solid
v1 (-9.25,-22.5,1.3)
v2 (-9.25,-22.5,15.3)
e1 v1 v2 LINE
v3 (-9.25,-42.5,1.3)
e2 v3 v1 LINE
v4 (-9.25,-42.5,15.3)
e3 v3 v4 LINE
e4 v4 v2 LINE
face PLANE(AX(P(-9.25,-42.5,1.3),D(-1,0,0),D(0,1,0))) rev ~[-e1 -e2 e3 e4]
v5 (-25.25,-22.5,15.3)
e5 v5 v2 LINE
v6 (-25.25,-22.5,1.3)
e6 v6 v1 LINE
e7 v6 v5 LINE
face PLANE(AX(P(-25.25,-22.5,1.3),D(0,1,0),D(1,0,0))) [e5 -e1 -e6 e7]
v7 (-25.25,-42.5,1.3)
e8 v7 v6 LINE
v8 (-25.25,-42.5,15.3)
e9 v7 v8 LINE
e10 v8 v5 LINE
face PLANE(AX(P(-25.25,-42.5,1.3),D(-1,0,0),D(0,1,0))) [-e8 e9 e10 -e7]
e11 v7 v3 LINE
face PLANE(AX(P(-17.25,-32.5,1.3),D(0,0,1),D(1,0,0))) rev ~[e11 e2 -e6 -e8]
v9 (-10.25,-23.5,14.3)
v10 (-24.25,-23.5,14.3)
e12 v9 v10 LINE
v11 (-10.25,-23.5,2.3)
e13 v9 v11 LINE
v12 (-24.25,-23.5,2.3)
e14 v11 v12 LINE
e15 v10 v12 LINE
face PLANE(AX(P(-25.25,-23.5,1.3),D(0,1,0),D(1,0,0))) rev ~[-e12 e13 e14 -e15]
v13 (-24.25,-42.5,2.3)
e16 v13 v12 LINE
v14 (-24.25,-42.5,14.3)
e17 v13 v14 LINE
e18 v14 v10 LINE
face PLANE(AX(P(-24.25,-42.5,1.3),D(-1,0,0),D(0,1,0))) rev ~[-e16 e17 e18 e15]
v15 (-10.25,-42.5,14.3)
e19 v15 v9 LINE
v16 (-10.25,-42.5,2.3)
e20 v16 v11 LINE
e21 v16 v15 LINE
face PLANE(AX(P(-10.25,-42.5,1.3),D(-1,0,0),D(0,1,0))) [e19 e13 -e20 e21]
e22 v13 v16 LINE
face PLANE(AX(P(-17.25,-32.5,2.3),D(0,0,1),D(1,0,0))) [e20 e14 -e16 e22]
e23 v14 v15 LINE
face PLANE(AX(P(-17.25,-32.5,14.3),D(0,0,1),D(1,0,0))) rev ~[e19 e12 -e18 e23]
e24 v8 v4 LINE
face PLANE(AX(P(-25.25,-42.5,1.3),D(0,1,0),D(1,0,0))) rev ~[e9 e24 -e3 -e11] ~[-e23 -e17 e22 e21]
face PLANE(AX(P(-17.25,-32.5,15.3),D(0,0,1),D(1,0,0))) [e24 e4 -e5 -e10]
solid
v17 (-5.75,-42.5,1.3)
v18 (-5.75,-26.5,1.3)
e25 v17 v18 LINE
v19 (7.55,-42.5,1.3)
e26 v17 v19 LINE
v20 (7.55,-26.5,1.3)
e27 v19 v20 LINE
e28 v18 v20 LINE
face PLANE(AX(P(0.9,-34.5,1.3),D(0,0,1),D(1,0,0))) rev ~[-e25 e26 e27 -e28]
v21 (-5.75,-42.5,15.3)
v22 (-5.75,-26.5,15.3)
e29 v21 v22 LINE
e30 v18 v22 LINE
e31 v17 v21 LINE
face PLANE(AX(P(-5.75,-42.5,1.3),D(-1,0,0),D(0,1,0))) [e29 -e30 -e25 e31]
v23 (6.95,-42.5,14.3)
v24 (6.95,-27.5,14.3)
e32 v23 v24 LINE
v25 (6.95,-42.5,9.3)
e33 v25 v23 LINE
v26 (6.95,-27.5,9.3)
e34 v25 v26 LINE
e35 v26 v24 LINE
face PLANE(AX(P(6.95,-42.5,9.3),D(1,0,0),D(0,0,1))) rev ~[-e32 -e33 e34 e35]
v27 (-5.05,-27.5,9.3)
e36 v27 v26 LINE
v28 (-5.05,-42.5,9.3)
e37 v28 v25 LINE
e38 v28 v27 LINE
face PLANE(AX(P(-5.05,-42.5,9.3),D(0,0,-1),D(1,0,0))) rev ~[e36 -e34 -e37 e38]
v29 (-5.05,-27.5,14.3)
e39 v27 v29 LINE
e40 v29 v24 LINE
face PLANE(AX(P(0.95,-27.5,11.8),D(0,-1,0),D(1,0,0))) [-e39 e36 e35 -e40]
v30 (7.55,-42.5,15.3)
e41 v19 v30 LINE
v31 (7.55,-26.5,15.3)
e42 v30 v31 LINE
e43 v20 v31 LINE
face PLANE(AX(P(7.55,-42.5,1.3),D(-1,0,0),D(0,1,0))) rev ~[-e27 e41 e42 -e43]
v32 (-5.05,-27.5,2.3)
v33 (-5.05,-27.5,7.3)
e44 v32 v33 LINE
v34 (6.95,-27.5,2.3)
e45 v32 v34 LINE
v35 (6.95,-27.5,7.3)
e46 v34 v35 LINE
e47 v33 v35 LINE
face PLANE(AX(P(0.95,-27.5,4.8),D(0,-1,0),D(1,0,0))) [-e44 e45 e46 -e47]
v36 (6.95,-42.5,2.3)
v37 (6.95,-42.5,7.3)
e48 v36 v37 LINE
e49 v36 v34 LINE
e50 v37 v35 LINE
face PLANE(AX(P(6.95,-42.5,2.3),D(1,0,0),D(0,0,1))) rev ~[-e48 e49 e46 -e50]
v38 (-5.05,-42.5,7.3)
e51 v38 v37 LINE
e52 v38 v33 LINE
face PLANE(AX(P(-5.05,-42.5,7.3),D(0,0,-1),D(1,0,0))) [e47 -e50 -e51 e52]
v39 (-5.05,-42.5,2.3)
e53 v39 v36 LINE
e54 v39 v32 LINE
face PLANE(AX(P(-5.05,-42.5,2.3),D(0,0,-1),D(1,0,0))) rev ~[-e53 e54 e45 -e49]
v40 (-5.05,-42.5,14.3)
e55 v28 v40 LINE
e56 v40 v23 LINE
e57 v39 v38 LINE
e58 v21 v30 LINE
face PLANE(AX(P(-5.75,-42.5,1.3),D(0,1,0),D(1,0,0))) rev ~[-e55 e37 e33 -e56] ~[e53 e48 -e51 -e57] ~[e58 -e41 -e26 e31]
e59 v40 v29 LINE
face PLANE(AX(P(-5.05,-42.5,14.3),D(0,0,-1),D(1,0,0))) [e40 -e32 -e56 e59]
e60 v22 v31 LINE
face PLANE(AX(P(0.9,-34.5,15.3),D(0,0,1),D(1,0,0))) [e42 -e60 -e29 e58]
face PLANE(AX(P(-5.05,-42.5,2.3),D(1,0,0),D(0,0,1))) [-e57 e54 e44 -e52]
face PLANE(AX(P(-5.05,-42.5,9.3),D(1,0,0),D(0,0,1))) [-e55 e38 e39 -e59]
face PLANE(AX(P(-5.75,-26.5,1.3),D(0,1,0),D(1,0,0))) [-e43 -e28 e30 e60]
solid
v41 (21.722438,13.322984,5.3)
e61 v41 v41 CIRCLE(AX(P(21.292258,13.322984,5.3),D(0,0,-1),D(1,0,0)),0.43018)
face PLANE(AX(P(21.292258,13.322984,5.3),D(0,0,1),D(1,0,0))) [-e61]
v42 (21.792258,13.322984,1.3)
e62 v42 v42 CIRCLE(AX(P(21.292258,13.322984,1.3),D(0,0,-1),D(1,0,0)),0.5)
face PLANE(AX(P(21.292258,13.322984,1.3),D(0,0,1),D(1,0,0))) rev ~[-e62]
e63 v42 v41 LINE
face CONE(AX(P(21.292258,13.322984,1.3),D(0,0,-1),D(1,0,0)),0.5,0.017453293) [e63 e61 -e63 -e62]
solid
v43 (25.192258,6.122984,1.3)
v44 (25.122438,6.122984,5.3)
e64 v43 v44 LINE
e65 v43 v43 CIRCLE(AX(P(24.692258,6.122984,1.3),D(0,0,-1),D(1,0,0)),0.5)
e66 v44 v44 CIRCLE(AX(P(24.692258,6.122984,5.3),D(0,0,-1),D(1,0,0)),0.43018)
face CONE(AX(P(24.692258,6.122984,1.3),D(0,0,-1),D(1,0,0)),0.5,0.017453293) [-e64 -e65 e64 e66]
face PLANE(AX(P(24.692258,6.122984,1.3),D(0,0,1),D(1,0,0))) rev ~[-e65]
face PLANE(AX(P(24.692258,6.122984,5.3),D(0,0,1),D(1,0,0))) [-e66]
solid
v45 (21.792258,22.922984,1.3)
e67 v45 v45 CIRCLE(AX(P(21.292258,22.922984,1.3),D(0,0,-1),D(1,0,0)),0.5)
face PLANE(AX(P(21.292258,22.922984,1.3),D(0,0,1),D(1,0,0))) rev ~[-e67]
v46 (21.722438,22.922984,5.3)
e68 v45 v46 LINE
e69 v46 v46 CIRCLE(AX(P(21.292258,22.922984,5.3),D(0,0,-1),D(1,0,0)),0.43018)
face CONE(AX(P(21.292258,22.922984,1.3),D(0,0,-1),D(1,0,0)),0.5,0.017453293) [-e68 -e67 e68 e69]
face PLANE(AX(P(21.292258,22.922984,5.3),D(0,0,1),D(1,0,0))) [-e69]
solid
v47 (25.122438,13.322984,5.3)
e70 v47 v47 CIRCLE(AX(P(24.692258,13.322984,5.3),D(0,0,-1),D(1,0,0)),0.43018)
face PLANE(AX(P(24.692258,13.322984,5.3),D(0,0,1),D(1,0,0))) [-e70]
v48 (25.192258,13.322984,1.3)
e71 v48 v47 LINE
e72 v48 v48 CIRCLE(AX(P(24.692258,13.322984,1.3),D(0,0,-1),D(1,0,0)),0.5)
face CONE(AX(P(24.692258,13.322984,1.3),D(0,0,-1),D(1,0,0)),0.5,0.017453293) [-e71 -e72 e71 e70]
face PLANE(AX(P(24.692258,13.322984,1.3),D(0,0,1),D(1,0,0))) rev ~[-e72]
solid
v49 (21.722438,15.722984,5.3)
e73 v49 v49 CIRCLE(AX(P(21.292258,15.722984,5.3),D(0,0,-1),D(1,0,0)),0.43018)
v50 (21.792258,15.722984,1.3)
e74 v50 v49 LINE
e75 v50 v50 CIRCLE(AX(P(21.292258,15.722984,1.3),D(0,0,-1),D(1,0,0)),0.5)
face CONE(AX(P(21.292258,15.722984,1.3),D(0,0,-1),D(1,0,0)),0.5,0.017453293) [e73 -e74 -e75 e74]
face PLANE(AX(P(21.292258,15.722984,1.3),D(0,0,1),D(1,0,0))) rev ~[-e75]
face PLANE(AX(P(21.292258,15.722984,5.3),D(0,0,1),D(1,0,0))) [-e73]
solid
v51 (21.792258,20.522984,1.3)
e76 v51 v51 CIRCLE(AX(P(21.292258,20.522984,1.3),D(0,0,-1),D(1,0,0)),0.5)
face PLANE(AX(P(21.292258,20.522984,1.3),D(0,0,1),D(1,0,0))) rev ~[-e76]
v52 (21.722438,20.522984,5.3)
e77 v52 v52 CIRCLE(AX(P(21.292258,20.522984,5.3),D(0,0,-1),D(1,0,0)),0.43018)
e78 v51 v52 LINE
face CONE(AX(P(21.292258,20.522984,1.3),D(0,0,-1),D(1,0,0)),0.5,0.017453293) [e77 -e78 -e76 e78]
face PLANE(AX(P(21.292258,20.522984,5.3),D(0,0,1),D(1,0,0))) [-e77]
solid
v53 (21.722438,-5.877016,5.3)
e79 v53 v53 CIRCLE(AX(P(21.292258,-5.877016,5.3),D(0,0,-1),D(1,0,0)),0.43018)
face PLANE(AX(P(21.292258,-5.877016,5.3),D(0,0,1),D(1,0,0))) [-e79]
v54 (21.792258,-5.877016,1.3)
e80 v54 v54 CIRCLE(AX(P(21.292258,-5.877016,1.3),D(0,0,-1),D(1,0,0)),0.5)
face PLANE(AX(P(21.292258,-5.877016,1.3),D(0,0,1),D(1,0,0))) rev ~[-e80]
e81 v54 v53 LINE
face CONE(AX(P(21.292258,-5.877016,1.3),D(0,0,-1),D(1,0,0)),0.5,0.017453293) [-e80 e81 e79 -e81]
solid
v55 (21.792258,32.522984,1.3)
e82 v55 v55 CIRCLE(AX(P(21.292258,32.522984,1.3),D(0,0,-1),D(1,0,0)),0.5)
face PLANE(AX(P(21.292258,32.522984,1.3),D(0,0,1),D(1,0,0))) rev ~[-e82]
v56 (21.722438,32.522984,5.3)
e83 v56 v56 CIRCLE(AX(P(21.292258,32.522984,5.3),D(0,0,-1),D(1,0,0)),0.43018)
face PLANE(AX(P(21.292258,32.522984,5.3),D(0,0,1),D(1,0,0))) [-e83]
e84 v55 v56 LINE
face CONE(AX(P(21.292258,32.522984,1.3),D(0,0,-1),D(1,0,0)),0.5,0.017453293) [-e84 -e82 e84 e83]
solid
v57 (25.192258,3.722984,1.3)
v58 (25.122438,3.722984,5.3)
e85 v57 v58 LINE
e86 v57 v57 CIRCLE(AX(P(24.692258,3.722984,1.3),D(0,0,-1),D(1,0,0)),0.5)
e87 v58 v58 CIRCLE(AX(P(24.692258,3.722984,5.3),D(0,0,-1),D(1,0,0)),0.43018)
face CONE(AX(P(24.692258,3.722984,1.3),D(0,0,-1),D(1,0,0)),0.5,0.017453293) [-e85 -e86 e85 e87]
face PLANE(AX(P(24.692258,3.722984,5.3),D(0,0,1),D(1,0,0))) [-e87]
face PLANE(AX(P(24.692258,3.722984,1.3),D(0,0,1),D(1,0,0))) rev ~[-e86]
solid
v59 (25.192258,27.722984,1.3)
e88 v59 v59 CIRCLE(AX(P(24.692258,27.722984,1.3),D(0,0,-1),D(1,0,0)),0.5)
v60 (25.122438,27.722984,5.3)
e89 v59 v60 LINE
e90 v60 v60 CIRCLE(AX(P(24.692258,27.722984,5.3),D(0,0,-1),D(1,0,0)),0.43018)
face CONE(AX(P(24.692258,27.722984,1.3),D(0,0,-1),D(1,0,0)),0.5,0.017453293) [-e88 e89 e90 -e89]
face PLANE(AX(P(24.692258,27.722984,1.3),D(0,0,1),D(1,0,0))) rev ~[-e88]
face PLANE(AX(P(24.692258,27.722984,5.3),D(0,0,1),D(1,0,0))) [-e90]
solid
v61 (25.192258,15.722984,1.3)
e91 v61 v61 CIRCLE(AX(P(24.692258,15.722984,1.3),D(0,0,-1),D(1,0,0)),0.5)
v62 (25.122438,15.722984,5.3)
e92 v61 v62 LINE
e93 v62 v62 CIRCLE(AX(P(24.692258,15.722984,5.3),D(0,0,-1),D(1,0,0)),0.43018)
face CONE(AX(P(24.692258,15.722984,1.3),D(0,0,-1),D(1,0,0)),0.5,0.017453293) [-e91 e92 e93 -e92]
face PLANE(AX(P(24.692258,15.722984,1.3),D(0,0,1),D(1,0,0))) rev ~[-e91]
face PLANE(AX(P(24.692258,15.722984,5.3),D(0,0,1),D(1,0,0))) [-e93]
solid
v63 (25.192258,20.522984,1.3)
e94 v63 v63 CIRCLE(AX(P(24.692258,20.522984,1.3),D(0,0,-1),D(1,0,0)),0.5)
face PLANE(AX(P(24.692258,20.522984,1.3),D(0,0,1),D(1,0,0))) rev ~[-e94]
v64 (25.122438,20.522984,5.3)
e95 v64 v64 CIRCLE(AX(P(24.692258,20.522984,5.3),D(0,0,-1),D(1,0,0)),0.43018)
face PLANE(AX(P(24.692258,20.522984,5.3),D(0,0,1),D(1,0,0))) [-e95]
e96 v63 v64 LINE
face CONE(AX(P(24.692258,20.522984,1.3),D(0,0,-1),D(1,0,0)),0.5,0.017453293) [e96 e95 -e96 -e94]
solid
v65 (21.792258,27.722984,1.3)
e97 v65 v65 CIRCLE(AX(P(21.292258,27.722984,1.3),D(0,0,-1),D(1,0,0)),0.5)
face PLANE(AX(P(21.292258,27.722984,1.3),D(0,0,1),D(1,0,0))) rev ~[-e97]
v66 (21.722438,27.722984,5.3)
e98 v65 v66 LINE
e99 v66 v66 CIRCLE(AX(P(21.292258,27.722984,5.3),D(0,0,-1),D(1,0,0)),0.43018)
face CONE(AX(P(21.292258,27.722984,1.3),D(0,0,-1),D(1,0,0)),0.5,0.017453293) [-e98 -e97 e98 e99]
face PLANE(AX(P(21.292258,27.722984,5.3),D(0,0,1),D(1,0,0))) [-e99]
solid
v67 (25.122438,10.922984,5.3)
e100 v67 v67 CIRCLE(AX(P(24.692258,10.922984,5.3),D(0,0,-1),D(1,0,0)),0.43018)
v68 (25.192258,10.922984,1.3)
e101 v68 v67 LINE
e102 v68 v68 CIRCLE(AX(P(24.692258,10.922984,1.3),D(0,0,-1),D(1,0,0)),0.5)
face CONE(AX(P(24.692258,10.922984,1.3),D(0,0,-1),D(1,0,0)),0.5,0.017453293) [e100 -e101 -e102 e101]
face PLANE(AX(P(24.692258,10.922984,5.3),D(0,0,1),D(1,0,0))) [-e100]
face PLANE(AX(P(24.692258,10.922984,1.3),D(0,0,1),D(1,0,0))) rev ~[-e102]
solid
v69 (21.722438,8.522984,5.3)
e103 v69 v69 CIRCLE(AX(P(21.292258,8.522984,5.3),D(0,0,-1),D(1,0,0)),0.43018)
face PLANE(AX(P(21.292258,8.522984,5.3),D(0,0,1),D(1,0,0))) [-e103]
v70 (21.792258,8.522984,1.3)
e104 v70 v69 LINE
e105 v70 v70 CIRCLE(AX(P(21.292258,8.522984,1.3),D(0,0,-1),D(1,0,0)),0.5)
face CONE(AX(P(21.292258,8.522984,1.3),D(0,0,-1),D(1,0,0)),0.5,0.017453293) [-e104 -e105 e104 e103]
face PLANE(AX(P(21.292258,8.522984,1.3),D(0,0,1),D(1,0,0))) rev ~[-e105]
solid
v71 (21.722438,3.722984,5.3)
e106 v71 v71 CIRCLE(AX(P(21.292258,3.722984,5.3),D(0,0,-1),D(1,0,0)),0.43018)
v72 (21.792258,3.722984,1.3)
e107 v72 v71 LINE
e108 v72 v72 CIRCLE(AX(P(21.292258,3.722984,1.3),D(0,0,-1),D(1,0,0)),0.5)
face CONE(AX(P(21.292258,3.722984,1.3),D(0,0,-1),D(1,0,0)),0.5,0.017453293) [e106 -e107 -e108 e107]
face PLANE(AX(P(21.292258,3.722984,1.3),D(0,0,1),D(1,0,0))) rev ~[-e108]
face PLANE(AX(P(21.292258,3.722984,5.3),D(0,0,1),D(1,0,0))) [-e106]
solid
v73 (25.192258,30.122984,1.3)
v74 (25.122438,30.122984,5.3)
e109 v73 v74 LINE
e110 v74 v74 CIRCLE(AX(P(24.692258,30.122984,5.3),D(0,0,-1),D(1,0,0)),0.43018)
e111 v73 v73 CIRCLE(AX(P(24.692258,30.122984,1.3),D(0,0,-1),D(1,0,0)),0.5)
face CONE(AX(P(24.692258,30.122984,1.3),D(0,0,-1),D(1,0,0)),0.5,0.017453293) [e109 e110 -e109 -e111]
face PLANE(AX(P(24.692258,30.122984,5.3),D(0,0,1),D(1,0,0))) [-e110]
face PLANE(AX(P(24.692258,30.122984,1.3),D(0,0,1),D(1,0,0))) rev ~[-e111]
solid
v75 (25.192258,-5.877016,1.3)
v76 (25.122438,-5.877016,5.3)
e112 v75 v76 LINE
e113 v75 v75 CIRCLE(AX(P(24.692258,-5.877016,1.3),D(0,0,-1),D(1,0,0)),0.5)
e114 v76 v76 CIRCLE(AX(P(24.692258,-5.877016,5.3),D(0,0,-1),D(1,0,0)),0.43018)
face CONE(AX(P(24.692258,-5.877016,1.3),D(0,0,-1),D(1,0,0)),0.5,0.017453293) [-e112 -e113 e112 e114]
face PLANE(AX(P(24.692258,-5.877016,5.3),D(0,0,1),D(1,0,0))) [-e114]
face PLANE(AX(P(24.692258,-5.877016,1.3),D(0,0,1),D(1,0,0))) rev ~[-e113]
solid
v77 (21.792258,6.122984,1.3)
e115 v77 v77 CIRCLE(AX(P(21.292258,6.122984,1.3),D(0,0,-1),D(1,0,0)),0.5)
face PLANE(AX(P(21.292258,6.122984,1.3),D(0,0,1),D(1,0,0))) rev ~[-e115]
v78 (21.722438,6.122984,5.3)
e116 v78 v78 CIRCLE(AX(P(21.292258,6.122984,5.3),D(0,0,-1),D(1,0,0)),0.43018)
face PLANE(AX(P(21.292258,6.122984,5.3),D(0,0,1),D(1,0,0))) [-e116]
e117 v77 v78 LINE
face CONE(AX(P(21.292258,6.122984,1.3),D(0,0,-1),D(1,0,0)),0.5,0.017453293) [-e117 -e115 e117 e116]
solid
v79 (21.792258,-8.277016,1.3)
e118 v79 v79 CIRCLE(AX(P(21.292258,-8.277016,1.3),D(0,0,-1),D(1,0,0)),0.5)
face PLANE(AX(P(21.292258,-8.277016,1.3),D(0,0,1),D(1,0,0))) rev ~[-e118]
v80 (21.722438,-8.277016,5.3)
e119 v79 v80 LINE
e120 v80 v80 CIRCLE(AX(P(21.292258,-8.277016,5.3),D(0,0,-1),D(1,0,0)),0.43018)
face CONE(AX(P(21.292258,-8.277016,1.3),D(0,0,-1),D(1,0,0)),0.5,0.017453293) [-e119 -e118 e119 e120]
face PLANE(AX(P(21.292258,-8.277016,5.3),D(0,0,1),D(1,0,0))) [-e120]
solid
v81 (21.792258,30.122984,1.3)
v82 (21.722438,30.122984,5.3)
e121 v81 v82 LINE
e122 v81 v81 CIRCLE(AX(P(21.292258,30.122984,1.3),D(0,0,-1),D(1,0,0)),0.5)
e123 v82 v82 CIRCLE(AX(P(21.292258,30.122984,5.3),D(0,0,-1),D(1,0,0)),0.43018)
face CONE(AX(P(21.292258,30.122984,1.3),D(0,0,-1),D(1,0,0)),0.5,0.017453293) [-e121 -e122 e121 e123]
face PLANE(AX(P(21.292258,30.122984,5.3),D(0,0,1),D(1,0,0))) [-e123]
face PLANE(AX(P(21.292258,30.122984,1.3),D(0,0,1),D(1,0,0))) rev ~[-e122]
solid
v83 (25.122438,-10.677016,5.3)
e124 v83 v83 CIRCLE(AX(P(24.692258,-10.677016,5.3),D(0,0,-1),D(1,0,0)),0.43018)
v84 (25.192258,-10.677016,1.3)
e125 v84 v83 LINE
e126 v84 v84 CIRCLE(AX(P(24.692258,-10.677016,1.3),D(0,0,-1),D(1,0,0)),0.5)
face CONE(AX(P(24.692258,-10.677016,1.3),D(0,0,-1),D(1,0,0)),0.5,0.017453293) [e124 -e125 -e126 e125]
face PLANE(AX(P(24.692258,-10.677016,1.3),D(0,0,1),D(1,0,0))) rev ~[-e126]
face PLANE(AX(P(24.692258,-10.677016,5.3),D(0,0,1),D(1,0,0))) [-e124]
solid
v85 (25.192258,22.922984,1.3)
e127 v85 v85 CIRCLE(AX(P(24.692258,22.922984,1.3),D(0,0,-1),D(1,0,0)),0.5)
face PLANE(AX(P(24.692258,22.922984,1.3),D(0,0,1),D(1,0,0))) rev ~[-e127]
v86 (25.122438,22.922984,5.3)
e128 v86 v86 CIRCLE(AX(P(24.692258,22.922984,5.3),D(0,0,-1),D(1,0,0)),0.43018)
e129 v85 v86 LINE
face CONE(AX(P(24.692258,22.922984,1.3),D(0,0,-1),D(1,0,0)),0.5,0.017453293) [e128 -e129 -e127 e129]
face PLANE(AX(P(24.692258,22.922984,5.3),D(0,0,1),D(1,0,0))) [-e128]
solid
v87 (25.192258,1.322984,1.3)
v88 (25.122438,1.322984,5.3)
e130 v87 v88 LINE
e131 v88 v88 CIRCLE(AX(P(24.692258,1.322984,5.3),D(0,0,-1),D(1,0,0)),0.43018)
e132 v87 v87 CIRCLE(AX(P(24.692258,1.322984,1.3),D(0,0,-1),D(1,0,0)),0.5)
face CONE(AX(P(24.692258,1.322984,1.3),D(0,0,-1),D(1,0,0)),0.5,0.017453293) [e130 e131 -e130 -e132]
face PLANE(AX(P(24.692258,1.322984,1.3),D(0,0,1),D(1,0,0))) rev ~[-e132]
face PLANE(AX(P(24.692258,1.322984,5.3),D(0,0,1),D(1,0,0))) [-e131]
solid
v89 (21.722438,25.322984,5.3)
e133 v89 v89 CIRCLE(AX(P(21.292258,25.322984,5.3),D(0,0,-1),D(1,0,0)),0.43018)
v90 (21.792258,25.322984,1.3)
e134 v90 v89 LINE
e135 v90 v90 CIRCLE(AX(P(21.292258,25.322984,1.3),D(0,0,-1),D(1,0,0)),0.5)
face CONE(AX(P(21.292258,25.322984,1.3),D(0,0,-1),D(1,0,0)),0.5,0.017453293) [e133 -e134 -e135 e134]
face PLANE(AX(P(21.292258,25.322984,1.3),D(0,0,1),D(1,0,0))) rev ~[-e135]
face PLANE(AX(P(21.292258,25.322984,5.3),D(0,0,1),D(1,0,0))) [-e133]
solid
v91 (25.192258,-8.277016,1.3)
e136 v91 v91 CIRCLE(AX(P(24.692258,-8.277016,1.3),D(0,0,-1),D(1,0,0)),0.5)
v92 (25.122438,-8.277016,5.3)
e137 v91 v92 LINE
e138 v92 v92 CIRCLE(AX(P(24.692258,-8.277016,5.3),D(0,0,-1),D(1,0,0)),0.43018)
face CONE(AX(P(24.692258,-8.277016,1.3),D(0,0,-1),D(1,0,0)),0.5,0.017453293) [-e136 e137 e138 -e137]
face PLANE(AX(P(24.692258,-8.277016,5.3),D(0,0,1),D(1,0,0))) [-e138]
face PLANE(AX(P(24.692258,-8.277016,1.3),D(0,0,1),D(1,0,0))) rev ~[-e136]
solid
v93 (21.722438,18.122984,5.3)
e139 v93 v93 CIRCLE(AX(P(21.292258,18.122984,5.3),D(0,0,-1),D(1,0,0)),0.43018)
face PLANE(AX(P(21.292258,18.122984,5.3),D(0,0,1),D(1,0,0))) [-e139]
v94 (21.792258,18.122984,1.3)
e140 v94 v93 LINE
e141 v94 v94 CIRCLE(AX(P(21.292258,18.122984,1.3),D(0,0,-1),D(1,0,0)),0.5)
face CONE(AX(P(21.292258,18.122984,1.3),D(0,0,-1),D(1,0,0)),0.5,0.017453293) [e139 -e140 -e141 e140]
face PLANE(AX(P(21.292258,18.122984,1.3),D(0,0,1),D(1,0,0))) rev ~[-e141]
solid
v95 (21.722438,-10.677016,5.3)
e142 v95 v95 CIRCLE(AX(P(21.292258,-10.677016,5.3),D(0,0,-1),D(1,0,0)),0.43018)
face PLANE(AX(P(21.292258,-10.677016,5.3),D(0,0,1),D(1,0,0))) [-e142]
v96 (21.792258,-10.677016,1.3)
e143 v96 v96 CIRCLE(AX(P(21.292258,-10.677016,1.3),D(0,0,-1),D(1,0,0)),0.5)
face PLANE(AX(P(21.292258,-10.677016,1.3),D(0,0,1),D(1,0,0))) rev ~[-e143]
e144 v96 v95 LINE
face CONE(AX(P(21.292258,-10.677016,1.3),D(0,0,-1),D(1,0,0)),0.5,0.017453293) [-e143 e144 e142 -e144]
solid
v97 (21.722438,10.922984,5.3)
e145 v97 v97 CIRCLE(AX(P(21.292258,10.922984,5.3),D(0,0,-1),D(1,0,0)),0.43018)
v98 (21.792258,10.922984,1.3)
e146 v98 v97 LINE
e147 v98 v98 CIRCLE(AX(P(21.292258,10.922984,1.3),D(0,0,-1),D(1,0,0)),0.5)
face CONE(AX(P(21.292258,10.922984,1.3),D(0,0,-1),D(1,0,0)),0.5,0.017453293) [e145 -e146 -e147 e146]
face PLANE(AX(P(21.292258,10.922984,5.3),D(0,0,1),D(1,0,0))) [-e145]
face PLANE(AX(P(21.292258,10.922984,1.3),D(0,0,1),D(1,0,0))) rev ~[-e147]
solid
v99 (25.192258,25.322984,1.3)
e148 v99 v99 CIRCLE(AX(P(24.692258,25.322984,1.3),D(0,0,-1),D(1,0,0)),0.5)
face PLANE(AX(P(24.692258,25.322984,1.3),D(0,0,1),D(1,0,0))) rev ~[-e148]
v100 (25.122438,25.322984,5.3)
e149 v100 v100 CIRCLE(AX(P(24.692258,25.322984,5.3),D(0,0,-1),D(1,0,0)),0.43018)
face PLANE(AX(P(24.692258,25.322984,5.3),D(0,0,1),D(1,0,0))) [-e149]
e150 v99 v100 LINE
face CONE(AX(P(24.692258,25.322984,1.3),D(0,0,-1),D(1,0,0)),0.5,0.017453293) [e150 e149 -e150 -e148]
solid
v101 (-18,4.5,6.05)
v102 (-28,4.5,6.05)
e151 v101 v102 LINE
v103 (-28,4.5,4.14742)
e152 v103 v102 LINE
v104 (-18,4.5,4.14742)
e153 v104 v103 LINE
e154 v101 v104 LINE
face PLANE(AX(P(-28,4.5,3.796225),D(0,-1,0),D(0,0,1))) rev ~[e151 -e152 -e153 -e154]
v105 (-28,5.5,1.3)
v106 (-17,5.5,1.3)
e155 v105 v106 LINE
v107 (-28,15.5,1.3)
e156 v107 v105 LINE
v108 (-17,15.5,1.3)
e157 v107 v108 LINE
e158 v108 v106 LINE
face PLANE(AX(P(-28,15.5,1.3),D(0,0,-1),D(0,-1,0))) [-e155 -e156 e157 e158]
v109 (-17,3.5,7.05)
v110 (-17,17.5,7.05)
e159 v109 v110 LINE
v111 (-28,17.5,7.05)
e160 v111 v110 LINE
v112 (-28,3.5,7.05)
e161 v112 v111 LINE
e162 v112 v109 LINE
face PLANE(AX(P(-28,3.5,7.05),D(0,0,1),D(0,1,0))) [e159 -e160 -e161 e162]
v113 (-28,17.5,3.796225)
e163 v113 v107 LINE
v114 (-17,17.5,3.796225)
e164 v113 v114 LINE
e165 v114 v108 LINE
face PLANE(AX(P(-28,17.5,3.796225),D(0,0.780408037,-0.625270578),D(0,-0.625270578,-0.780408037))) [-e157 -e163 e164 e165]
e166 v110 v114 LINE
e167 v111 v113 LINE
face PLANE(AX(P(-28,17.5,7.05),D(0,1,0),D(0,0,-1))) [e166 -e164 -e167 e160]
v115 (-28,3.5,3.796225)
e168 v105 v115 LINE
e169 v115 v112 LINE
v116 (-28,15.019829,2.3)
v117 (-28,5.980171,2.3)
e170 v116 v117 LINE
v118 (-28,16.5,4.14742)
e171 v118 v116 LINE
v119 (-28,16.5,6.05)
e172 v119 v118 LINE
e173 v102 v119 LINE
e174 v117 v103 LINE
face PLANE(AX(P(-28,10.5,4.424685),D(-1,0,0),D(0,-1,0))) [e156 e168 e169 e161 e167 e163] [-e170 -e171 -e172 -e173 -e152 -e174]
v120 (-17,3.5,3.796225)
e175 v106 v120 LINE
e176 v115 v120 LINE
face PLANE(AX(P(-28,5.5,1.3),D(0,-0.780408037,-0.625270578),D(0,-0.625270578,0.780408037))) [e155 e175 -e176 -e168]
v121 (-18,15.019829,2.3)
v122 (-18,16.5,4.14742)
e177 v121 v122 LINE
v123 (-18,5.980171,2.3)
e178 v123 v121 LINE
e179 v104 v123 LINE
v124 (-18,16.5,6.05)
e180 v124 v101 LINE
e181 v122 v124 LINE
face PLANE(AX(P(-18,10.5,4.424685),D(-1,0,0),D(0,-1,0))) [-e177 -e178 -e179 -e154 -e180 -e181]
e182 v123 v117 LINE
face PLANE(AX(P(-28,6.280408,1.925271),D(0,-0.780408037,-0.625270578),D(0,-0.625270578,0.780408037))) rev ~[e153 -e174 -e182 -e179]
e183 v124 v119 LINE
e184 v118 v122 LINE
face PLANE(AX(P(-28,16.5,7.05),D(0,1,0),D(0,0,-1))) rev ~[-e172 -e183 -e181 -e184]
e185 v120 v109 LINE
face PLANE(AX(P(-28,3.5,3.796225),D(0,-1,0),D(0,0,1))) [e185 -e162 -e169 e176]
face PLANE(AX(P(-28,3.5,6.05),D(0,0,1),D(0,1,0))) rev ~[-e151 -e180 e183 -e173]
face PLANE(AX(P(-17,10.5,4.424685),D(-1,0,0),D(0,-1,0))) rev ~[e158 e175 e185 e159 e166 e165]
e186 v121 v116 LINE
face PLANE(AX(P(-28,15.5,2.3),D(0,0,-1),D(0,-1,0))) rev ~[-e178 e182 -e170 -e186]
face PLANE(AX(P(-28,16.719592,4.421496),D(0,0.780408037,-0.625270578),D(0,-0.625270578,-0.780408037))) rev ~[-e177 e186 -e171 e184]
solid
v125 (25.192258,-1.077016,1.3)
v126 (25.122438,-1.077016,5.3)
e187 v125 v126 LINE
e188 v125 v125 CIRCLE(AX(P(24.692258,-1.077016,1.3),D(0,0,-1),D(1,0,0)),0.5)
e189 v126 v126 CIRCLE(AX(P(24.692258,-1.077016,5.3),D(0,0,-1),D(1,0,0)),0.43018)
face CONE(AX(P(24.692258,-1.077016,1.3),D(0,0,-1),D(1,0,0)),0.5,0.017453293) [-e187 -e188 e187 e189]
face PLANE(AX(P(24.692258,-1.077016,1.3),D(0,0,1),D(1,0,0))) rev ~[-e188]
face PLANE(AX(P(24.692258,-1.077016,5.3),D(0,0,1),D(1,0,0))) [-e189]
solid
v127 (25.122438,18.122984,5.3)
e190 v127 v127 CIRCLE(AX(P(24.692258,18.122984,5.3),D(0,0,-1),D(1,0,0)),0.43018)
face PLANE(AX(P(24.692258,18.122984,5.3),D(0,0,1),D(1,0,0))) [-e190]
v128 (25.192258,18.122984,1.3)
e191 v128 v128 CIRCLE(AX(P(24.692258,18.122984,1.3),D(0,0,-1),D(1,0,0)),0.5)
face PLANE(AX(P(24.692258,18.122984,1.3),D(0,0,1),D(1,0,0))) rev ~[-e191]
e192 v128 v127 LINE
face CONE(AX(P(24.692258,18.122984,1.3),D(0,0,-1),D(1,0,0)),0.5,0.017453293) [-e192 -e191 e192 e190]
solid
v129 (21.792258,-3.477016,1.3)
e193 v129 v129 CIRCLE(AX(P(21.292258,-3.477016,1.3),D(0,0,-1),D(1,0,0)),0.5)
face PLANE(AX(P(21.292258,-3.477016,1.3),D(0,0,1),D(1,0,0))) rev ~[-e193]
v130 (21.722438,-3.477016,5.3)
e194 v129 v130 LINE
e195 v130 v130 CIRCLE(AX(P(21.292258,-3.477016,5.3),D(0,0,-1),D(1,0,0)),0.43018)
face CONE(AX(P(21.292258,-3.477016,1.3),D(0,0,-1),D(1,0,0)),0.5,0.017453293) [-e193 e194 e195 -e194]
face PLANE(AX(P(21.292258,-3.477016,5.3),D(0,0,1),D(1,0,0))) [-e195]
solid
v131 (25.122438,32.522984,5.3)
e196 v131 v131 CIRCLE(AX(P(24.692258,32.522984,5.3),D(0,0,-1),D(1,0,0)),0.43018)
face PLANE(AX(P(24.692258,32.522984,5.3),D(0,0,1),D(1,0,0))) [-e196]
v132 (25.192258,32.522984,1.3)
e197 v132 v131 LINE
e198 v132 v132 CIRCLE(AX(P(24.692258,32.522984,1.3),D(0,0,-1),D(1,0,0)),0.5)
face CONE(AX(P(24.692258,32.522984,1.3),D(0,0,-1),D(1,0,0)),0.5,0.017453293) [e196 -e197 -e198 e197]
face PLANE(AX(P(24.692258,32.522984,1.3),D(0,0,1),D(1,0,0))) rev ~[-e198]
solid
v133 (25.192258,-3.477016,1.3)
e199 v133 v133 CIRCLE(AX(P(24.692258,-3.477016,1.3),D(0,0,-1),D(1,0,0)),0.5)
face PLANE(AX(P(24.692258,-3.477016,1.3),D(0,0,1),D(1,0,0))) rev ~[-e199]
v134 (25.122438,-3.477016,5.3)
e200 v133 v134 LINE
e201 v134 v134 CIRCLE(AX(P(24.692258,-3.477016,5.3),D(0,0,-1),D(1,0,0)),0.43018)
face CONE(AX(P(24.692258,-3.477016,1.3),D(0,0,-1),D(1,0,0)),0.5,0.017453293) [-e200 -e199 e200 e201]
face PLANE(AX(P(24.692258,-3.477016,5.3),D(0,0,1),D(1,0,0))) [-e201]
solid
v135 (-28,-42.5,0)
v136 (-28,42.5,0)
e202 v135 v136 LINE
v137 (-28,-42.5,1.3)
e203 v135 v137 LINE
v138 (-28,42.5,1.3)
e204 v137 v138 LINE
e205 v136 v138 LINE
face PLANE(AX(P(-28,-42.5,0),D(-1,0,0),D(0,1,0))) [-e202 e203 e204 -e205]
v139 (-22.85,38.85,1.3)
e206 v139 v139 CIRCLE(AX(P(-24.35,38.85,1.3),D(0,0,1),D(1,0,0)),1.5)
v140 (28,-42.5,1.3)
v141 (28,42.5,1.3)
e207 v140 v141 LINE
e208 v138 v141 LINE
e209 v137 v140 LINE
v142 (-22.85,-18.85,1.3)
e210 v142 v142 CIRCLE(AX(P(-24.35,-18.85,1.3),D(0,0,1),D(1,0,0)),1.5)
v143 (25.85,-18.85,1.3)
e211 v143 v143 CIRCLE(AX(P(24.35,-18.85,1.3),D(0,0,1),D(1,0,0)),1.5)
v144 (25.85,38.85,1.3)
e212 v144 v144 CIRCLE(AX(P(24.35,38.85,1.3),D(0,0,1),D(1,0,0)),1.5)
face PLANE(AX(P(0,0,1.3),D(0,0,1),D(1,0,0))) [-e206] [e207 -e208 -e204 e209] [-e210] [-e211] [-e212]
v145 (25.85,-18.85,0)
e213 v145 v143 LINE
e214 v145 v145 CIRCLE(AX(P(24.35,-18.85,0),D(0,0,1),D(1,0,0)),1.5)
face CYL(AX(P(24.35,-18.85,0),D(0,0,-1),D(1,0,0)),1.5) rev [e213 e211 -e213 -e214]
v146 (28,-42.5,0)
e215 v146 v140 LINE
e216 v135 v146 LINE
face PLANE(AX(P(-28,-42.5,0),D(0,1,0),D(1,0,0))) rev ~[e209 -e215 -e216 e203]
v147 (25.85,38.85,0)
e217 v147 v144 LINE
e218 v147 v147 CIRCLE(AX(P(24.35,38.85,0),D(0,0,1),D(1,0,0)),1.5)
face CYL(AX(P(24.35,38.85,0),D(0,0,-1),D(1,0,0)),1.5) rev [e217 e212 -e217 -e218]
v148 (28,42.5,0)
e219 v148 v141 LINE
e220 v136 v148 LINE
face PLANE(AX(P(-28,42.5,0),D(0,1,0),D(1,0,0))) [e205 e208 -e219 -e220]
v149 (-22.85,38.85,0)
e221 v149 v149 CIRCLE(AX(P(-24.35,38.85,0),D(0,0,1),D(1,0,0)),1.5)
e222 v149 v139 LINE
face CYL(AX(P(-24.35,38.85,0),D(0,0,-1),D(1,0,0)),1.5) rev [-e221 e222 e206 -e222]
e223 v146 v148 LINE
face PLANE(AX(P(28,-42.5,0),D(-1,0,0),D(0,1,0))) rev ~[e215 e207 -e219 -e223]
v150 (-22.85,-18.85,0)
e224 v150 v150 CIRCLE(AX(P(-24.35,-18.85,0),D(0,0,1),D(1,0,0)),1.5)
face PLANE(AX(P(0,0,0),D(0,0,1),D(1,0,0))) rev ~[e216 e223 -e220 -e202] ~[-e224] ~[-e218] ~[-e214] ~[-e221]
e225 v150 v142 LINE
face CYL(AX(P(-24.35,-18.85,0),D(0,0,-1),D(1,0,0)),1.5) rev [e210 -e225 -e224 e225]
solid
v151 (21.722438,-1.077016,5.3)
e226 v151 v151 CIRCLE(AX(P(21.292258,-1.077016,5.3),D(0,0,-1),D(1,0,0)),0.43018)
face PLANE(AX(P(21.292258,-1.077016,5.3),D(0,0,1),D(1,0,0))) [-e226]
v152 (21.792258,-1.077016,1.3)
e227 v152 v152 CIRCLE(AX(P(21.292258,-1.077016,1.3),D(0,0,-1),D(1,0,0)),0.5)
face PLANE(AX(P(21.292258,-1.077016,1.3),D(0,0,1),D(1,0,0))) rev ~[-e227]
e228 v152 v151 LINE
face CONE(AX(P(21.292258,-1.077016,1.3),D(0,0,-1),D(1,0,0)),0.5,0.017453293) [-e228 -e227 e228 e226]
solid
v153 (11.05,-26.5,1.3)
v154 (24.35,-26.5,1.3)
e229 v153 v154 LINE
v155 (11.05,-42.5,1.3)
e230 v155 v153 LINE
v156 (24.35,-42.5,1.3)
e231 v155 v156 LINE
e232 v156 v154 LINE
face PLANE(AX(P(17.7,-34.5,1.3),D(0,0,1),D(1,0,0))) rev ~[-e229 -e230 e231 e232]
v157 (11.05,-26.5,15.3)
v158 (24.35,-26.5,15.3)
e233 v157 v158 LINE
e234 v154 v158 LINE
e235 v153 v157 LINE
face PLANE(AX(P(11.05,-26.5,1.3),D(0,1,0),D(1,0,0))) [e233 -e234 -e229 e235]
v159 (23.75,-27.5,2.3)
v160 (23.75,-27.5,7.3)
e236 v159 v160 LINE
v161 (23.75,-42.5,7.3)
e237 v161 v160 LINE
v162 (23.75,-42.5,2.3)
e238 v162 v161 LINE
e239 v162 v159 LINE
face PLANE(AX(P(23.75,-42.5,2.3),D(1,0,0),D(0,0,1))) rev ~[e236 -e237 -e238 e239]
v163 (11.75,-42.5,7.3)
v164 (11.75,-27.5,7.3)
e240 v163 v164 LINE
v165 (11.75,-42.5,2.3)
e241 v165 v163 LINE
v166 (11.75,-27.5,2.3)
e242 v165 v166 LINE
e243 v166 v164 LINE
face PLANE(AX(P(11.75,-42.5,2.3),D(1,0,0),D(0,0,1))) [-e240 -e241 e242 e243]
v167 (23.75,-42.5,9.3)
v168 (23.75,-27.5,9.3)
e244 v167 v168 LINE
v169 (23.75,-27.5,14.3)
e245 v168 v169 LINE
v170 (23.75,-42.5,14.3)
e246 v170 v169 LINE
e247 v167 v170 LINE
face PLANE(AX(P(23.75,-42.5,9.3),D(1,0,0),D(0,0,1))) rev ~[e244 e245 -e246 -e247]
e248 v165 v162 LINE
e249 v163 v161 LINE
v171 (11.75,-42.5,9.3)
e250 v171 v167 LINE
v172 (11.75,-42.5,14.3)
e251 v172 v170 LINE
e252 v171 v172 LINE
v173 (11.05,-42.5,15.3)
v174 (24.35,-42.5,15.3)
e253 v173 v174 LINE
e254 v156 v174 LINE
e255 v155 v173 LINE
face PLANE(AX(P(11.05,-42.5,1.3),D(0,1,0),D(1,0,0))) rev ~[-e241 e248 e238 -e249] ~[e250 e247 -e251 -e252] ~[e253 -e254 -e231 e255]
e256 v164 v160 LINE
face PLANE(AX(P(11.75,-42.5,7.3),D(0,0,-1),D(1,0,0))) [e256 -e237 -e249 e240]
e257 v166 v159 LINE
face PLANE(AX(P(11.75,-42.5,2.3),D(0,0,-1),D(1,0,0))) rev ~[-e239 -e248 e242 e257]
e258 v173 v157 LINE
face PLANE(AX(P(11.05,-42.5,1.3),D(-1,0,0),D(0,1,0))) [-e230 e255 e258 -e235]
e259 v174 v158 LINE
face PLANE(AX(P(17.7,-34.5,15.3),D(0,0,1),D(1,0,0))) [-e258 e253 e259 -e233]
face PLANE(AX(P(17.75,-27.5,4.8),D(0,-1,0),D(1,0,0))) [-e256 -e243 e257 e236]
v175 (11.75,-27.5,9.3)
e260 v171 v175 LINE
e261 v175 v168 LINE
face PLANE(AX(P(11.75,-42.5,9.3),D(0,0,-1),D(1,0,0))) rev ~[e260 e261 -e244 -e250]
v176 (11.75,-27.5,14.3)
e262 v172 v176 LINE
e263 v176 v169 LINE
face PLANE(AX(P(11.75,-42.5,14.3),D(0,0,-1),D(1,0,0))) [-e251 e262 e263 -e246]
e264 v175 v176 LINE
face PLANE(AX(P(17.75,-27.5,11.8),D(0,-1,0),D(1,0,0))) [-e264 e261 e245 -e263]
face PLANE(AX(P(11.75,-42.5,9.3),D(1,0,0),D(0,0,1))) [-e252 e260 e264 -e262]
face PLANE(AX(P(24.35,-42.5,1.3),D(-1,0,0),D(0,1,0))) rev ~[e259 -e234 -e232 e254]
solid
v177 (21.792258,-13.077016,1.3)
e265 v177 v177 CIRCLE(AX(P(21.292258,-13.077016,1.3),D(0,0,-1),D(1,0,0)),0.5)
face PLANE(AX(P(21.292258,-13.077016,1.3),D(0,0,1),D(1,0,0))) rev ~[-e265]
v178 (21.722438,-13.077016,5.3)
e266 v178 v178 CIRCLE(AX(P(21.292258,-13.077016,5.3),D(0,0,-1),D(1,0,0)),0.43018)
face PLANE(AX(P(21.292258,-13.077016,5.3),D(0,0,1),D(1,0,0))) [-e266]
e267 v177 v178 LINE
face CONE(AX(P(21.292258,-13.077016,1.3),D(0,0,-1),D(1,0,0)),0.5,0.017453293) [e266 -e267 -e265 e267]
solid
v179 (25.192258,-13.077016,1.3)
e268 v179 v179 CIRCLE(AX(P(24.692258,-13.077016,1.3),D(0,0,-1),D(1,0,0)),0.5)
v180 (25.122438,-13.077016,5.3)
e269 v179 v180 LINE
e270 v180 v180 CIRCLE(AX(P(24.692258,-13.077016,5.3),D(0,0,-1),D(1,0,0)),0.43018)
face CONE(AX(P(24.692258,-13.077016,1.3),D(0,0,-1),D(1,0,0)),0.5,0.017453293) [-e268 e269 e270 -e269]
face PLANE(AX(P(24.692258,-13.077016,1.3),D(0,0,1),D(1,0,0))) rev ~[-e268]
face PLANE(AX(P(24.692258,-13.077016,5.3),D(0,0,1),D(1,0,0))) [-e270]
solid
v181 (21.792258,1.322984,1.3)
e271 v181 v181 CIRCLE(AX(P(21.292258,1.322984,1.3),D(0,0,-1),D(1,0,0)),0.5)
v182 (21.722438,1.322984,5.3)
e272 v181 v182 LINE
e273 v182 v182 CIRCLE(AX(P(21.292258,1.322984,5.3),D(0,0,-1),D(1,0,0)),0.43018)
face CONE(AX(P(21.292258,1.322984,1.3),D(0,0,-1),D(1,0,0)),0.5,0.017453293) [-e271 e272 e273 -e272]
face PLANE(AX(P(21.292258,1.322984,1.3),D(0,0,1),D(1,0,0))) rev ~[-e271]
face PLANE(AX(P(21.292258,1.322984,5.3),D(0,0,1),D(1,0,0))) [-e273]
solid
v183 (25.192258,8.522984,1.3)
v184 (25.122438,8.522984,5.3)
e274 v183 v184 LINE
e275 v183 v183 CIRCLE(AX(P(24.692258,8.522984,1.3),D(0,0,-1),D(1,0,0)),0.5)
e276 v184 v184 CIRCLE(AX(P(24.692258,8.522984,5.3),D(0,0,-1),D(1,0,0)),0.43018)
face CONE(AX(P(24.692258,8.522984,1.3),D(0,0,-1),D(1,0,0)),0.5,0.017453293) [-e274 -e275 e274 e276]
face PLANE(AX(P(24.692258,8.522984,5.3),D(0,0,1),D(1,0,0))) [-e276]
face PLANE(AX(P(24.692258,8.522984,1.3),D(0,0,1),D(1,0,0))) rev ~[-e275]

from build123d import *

# Parameters (mm, degrees)
F0_W      = 56
F0_H      = 85
F0_R      = 1.5
F1_DEPTH  = 1.3
F2_W      = 16
F2_H      = 20
F3_DEPTH  = 14
F2_W_2    = 13.3
F2_H_2    = 16
F4_T      = -1
F5_W      = 12
F5_H      = 5
F6_DEPTH  = 15
F8_DEPTH  = 11
F9_T      = -1
F10_R     = 0.5
F11_DEPTH = 4
F11_TAPER = 1


with BuildPart() as f1:
    # F0 (on Top) → F1 (new body)
    with BuildSketch(Plane.XY):
        Rectangle(F0_W, F0_H)
        with Locations((-24.35, -18.85)):
            Circle(F0_R, mode=Mode.SUBTRACT)
        with Locations((24.35, -18.85)):
            Circle(F0_R, mode=Mode.SUBTRACT)
        with Locations((-24.35, 38.85)):
            Circle(F0_R, mode=Mode.SUBTRACT)
        with Locations((24.35, 38.85)):
            Circle(F0_R, mode=Mode.SUBTRACT)
    extrude(amount=F1_DEPTH)


with BuildPart() as f3:
    # F2 (on face) → F3 (new body)
    with BuildSketch(Plane.XY.offset(1.3)):
        with Locations((-17.25, -32.5)):
            Rectangle(F2_W, F2_H)
    extrude(amount=F3_DEPTH)

    # F4
    f4_openings = [f3.faces().sort_by_distance(p)[0] for p in [
        (-17.25, -42.5, 8.3),
    ]]
    offset(amount=F4_T, openings=f4_openings)


with BuildPart() as f3b:
    # F2 (on face) → F3, piece 2 (new body)
    with BuildSketch(Plane.XY.offset(1.3)):
        with Locations((0.9, -34.5)):
            Rectangle(F2_W_2, F2_H_2)
    extrude(amount=F3_DEPTH)


with BuildPart() as f3c:
    # F2 (on face) → F3, piece 3 (new body)
    with BuildSketch(Plane.XY.offset(1.3)):
        with Locations((17.7, -34.5)):
            Rectangle(F2_W_2, F2_H_2)
    extrude(amount=F3_DEPTH)


with BuildPart() as f6_tool:
    # F5 (on face) → F6 (new body, through all)
    with BuildSketch(Plane.XZ.offset(42.5)):
        with Locations((0.95, 11.8)):
            Rectangle(F5_W, F5_H)
        with Locations((0.95, 4.8)):
            Rectangle(F5_W, F5_H)
        with Locations((17.75, 11.8)):
            Rectangle(F5_W, F5_H)
        with Locations((17.75, 4.8)):
            Rectangle(F5_W, F5_H)
    extrude(amount=-F6_DEPTH)


with BuildPart() as f3b_1:
    add(f3b.part)

    # F6: cut by f6_tool
    add(f6_tool.part, mode=Mode.SUBTRACT)


with BuildPart() as f3c_1:
    add(f3c.part)

    # F6: cut by f6_tool
    add(f6_tool.part, mode=Mode.SUBTRACT)


with BuildPart() as f8:
    # F7 (on face) → F8 (new body)
    with BuildSketch(Plane(origin=(-28, 0, 0), x_dir=(0, -1, 0), z_dir=(-1, 0, 0))):
        Polygon((-17.5, 3.7962250415), (-15.5, 1.3), (-5.5, 1.3), (-3.5, 3.7962250415), (-3.5, 7.05), (-17.5, 7.05), align=None)
    extrude(amount=-F8_DEPTH)

    # F9
    f9_openings = [f8.faces().sort_by_distance(p)[0] for p in [
        (-28, 10.5, 4.310075),
    ]]
    offset(amount=F9_T, openings=f9_openings)


with BuildPart() as f11:
    # F10 (on face) → F11 (new body)
    with BuildSketch(Plane.XY.offset(1.3)):
        with Locations((21.292258054, 32.522983849)):
            Circle(F10_R)
    extrude(amount=F11_DEPTH, taper=F11_TAPER)


with BuildPart() as f11b:
    # F10 (on face) → F11, piece 2 (new body)
    with BuildSketch(Plane.XY.offset(1.3)):
        with Locations((21.292258054, 30.122983849)):
            Circle(F10_R)
    extrude(amount=F11_DEPTH, taper=F11_TAPER)


with BuildPart() as f11c:
    # F10 (on face) → F11, piece 3 (new body)
    with BuildSketch(Plane.XY.offset(1.3)):
        with Locations((21.292258054, 27.722983849)):
            Circle(F10_R)
    extrude(amount=F11_DEPTH, taper=F11_TAPER)


with BuildPart() as f11d:
    # F10 (on face) → F11, piece 4 (new body)
    with BuildSketch(Plane.XY.offset(1.3)):
        with Locations((21.292258054, 25.322983849)):
            Circle(F10_R)
    extrude(amount=F11_DEPTH, taper=F11_TAPER)


with BuildPart() as f11e:
    # F10 (on face) → F11, piece 5 (new body)
    with BuildSketch(Plane.XY.offset(1.3)):
        with Locations((21.292258054, 22.922983849)):
            Circle(F10_R)
    extrude(amount=F11_DEPTH, taper=F11_TAPER)


with BuildPart() as f11f:
    # F10 (on face) → F11, piece 6 (new body)
    with BuildSketch(Plane.XY.offset(1.3)):
        with Locations((21.292258054, 20.522983849)):
            Circle(F10_R)
    extrude(amount=F11_DEPTH, taper=F11_TAPER)


with BuildPart() as f11g:
    # F10 (on face) → F11, piece 7 (new body)
    with BuildSketch(Plane.XY.offset(1.3)):
        with Locations((21.292258054, 18.122983849)):
            Circle(F10_R)
    extrude(amount=F11_DEPTH, taper=F11_TAPER)


with BuildPart() as f11h:
    # F10 (on face) → F11, piece 8 (new body)
    with BuildSketch(Plane.XY.offset(1.3)):
        with Locations((21.292258054, 15.722983849)):
            Circle(F10_R)
    extrude(amount=F11_DEPTH, taper=F11_TAPER)


with BuildPart() as f11i:
    # F10 (on face) → F11, piece 9 (new body)
    with BuildSketch(Plane.XY.offset(1.3)):
        with Locations((21.292258054, 13.322983849)):
            Circle(F10_R)
    extrude(amount=F11_DEPTH, taper=F11_TAPER)


with BuildPart() as f11j:
    # F10 (on face) → F11, piece 10 (new body)
    with BuildSketch(Plane.XY.offset(1.3)):
        with Locations((21.292258054, 10.922983849)):
            Circle(F10_R)
    extrude(amount=F11_DEPTH, taper=F11_TAPER)


with BuildPart() as f11k:
    # F10 (on face) → F11, piece 11 (new body)
    with BuildSketch(Plane.XY.offset(1.3)):
        with Locations((21.292258054, 8.522983849)):
            Circle(F10_R)
    extrude(amount=F11_DEPTH, taper=F11_TAPER)


with BuildPart() as f11l:
    # F10 (on face) → F11, piece 12 (new body)
    with BuildSketch(Plane.XY.offset(1.3)):
        with Locations((21.292258054, 6.122983849)):
            Circle(F10_R)
    extrude(amount=F11_DEPTH, taper=F11_TAPER)


with BuildPart() as f11m:
    # F10 (on face) → F11, piece 13 (new body)
    with BuildSketch(Plane.XY.offset(1.3)):
        with Locations((21.292258054, 3.722983849)):
            Circle(F10_R)
    extrude(amount=F11_DEPTH, taper=F11_TAPER)


with BuildPart() as f11n:
    # F10 (on face) → F11, piece 14 (new body)
    with BuildSketch(Plane.XY.offset(1.3)):
        with Locations((21.292258054, 1.322983849)):
            Circle(F10_R)
    extrude(amount=F11_DEPTH, taper=F11_TAPER)


with BuildPart() as f11o:
    # F10 (on face) → F11, piece 15 (new body)
    with BuildSketch(Plane.XY.offset(1.3)):
        with Locations((21.292258054, -1.077016151)):
            Circle(F10_R)
    extrude(amount=F11_DEPTH, taper=F11_TAPER)


with BuildPart() as f11p:
    # F10 (on face) → F11, piece 16 (new body)
    with BuildSketch(Plane.XY.offset(1.3)):
        with Locations((21.292258054, -3.477016151)):
            Circle(F10_R)
    extrude(amount=F11_DEPTH, taper=F11_TAPER)


with BuildPart() as f11q:
    # F10 (on face) → F11, piece 17 (new body)
    with BuildSketch(Plane.XY.offset(1.3)):
        with Locations((21.292258054, -5.877016151)):
            Circle(F10_R)
    extrude(amount=F11_DEPTH, taper=F11_TAPER)


with BuildPart() as f11r:
    # F10 (on face) → F11, piece 18 (new body)
    with BuildSketch(Plane.XY.offset(1.3)):
        with Locations((21.292258054, -8.277016151)):
            Circle(F10_R)
    extrude(amount=F11_DEPTH, taper=F11_TAPER)


with BuildPart() as f11s:
    # F10 (on face) → F11, piece 19 (new body)
    with BuildSketch(Plane.XY.offset(1.3)):
        with Locations((21.292258054, -10.677016151)):
            Circle(F10_R)
    extrude(amount=F11_DEPTH, taper=F11_TAPER)


with BuildPart() as f11t:
    # F10 (on face) → F11, piece 20 (new body)
    with BuildSketch(Plane.XY.offset(1.3)):
        with Locations((21.292258054, -13.077016151)):
            Circle(F10_R)
    extrude(amount=F11_DEPTH, taper=F11_TAPER)


with BuildPart() as f11u:
    # F10 (on face) → F11, piece 21 (new body)
    with BuildSketch(Plane.XY.offset(1.3)):
        with Locations((24.692258054, 32.522983849)):
            Circle(F10_R)
    extrude(amount=F11_DEPTH, taper=F11_TAPER)


with BuildPart() as f11v:
    # F10 (on face) → F11, piece 22 (new body)
    with BuildSketch(Plane.XY.offset(1.3)):
        with Locations((24.692258054, 30.122983849)):
            Circle(F10_R)
    extrude(amount=F11_DEPTH, taper=F11_TAPER)


with BuildPart() as f11w:
    # F10 (on face) → F11, piece 23 (new body)
    with BuildSketch(Plane.XY.offset(1.3)):
        with Locations((24.692258054, 27.722983849)):
            Circle(F10_R)
    extrude(amount=F11_DEPTH, taper=F11_TAPER)


with BuildPart() as f11x:
    # F10 (on face) → F11, piece 24 (new body)
    with BuildSketch(Plane.XY.offset(1.3)):
        with Locations((24.692258054, 25.322983849)):
            Circle(F10_R)
    extrude(amount=F11_DEPTH, taper=F11_TAPER)


with BuildPart() as f11y:
    # F10 (on face) → F11, piece 25 (new body)
    with BuildSketch(Plane.XY.offset(1.3)):
        with Locations((24.692258054, 22.922983849)):
            Circle(F10_R)
    extrude(amount=F11_DEPTH, taper=F11_TAPER)


with BuildPart() as f11z:
    # F10 (on face) → F11, piece 26 (new body)
    with BuildSketch(Plane.XY.offset(1.3)):
        with Locations((24.692258054, 20.522983849)):
            Circle(F10_R)
    extrude(amount=F11_DEPTH, taper=F11_TAPER)


with BuildPart() as f11ba:
    # F10 (on face) → F11, piece 27 (new body)
    with BuildSketch(Plane.XY.offset(1.3)):
        with Locations((24.692258054, 18.122983849)):
            Circle(F10_R)
    extrude(amount=F11_DEPTH, taper=F11_TAPER)


with BuildPart() as f11bb:
    # F10 (on face) → F11, piece 28 (new body)
    with BuildSketch(Plane.XY.offset(1.3)):
        with Locations((24.692258054, 15.722983849)):
            Circle(F10_R)
    extrude(amount=F11_DEPTH, taper=F11_TAPER)


with BuildPart() as f11bc:
    # F10 (on face) → F11, piece 29 (new body)
    with BuildSketch(Plane.XY.offset(1.3)):
        with Locations((24.692258054, 13.322983849)):
            Circle(F10_R)
    extrude(amount=F11_DEPTH, taper=F11_TAPER)


with BuildPart() as f11bd:
    # F10 (on face) → F11, piece 30 (new body)
    with BuildSketch(Plane.XY.offset(1.3)):
        with Locations((24.692258054, 10.922983849)):
            Circle(F10_R)
    extrude(amount=F11_DEPTH, taper=F11_TAPER)


with BuildPart() as f11be:
    # F10 (on face) → F11, piece 31 (new body)
    with BuildSketch(Plane.XY.offset(1.3)):
        with Locations((24.692258054, 8.522983849)):
            Circle(F10_R)
    extrude(amount=F11_DEPTH, taper=F11_TAPER)


with BuildPart() as f11bf:
    # F10 (on face) → F11, piece 32 (new body)
    with BuildSketch(Plane.XY.offset(1.3)):
        with Locations((24.692258054, 6.122983849)):
            Circle(F10_R)
    extrude(amount=F11_DEPTH, taper=F11_TAPER)


with BuildPart() as f11bg:
    # F10 (on face) → F11, piece 33 (new body)
    with BuildSketch(Plane.XY.offset(1.3)):
        with Locations((24.692258054, 3.722983849)):
            Circle(F10_R)
    extrude(amount=F11_DEPTH, taper=F11_TAPER)


with BuildPart() as f11bh:
    # F10 (on face) → F11, piece 34 (new body)
    with BuildSketch(Plane.XY.offset(1.3)):
        with Locations((24.692258054, 1.322983849)):
            Circle(F10_R)
    extrude(amount=F11_DEPTH, taper=F11_TAPER)


with BuildPart() as f11bi:
    # F10 (on face) → F11, piece 35 (new body)
    with BuildSketch(Plane.XY.offset(1.3)):
        with Locations((24.692258054, -1.077016151)):
            Circle(F10_R)
    extrude(amount=F11_DEPTH, taper=F11_TAPER)


with BuildPart() as f11bj:
    # F10 (on face) → F11, piece 36 (new body)
    with BuildSketch(Plane.XY.offset(1.3)):
        with Locations((24.692258054, -3.477016151)):
            Circle(F10_R)
    extrude(amount=F11_DEPTH, taper=F11_TAPER)


with BuildPart() as f11bk:
    # F10 (on face) → F11, piece 37 (new body)
    with BuildSketch(Plane.XY.offset(1.3)):
        with Locations((24.692258054, -5.877016151)):
            Circle(F10_R)
    extrude(amount=F11_DEPTH, taper=F11_TAPER)


with BuildPart() as f11bl:
    # F10 (on face) → F11, piece 38 (new body)
    with BuildSketch(Plane.XY.offset(1.3)):
        with Locations((24.692258054, -8.277016151)):
            Circle(F10_R)
    extrude(amount=F11_DEPTH, taper=F11_TAPER)


with BuildPart() as f11bm:
    # F10 (on face) → F11, piece 39 (new body)
    with BuildSketch(Plane.XY.offset(1.3)):
        with Locations((24.692258054, -10.677016151)):
            Circle(F10_R)
    extrude(amount=F11_DEPTH, taper=F11_TAPER)


with BuildPart() as f11bn:
    # F10 (on face) → F11, piece 40 (new body)
    with BuildSketch(Plane.XY.offset(1.3)):
        with Locations((24.692258054, -13.077016151)):
            Circle(F10_R)
    extrude(amount=F11_DEPTH, taper=F11_TAPER)


solid = Compound([f1.part, f3.part, f3b_1.part, f3c_1.part, f8.part, f11.part, f11b.part, f11c.part, f11d.part, f11e.part, f11f.part, f11g.part, f11h.part, f11i.part, f11j.part, f11k.part, f11l.part, f11m.part, f11n.part, f11o.part, f11p.part, f11q.part, f11r.part, f11s.part, f11t.part, f11u.part, f11v.part, f11w.part, f11x.part, f11y.part, f11z.part, f11ba.part, f11bb.part, f11bc.part, f11bd.part, f11be.part, f11bf.part, f11bg.part, f11bh.part, f11bi.part, f11bj.part, f11bk.part, f11bl.part, f11bm.part, f11bn.part])
